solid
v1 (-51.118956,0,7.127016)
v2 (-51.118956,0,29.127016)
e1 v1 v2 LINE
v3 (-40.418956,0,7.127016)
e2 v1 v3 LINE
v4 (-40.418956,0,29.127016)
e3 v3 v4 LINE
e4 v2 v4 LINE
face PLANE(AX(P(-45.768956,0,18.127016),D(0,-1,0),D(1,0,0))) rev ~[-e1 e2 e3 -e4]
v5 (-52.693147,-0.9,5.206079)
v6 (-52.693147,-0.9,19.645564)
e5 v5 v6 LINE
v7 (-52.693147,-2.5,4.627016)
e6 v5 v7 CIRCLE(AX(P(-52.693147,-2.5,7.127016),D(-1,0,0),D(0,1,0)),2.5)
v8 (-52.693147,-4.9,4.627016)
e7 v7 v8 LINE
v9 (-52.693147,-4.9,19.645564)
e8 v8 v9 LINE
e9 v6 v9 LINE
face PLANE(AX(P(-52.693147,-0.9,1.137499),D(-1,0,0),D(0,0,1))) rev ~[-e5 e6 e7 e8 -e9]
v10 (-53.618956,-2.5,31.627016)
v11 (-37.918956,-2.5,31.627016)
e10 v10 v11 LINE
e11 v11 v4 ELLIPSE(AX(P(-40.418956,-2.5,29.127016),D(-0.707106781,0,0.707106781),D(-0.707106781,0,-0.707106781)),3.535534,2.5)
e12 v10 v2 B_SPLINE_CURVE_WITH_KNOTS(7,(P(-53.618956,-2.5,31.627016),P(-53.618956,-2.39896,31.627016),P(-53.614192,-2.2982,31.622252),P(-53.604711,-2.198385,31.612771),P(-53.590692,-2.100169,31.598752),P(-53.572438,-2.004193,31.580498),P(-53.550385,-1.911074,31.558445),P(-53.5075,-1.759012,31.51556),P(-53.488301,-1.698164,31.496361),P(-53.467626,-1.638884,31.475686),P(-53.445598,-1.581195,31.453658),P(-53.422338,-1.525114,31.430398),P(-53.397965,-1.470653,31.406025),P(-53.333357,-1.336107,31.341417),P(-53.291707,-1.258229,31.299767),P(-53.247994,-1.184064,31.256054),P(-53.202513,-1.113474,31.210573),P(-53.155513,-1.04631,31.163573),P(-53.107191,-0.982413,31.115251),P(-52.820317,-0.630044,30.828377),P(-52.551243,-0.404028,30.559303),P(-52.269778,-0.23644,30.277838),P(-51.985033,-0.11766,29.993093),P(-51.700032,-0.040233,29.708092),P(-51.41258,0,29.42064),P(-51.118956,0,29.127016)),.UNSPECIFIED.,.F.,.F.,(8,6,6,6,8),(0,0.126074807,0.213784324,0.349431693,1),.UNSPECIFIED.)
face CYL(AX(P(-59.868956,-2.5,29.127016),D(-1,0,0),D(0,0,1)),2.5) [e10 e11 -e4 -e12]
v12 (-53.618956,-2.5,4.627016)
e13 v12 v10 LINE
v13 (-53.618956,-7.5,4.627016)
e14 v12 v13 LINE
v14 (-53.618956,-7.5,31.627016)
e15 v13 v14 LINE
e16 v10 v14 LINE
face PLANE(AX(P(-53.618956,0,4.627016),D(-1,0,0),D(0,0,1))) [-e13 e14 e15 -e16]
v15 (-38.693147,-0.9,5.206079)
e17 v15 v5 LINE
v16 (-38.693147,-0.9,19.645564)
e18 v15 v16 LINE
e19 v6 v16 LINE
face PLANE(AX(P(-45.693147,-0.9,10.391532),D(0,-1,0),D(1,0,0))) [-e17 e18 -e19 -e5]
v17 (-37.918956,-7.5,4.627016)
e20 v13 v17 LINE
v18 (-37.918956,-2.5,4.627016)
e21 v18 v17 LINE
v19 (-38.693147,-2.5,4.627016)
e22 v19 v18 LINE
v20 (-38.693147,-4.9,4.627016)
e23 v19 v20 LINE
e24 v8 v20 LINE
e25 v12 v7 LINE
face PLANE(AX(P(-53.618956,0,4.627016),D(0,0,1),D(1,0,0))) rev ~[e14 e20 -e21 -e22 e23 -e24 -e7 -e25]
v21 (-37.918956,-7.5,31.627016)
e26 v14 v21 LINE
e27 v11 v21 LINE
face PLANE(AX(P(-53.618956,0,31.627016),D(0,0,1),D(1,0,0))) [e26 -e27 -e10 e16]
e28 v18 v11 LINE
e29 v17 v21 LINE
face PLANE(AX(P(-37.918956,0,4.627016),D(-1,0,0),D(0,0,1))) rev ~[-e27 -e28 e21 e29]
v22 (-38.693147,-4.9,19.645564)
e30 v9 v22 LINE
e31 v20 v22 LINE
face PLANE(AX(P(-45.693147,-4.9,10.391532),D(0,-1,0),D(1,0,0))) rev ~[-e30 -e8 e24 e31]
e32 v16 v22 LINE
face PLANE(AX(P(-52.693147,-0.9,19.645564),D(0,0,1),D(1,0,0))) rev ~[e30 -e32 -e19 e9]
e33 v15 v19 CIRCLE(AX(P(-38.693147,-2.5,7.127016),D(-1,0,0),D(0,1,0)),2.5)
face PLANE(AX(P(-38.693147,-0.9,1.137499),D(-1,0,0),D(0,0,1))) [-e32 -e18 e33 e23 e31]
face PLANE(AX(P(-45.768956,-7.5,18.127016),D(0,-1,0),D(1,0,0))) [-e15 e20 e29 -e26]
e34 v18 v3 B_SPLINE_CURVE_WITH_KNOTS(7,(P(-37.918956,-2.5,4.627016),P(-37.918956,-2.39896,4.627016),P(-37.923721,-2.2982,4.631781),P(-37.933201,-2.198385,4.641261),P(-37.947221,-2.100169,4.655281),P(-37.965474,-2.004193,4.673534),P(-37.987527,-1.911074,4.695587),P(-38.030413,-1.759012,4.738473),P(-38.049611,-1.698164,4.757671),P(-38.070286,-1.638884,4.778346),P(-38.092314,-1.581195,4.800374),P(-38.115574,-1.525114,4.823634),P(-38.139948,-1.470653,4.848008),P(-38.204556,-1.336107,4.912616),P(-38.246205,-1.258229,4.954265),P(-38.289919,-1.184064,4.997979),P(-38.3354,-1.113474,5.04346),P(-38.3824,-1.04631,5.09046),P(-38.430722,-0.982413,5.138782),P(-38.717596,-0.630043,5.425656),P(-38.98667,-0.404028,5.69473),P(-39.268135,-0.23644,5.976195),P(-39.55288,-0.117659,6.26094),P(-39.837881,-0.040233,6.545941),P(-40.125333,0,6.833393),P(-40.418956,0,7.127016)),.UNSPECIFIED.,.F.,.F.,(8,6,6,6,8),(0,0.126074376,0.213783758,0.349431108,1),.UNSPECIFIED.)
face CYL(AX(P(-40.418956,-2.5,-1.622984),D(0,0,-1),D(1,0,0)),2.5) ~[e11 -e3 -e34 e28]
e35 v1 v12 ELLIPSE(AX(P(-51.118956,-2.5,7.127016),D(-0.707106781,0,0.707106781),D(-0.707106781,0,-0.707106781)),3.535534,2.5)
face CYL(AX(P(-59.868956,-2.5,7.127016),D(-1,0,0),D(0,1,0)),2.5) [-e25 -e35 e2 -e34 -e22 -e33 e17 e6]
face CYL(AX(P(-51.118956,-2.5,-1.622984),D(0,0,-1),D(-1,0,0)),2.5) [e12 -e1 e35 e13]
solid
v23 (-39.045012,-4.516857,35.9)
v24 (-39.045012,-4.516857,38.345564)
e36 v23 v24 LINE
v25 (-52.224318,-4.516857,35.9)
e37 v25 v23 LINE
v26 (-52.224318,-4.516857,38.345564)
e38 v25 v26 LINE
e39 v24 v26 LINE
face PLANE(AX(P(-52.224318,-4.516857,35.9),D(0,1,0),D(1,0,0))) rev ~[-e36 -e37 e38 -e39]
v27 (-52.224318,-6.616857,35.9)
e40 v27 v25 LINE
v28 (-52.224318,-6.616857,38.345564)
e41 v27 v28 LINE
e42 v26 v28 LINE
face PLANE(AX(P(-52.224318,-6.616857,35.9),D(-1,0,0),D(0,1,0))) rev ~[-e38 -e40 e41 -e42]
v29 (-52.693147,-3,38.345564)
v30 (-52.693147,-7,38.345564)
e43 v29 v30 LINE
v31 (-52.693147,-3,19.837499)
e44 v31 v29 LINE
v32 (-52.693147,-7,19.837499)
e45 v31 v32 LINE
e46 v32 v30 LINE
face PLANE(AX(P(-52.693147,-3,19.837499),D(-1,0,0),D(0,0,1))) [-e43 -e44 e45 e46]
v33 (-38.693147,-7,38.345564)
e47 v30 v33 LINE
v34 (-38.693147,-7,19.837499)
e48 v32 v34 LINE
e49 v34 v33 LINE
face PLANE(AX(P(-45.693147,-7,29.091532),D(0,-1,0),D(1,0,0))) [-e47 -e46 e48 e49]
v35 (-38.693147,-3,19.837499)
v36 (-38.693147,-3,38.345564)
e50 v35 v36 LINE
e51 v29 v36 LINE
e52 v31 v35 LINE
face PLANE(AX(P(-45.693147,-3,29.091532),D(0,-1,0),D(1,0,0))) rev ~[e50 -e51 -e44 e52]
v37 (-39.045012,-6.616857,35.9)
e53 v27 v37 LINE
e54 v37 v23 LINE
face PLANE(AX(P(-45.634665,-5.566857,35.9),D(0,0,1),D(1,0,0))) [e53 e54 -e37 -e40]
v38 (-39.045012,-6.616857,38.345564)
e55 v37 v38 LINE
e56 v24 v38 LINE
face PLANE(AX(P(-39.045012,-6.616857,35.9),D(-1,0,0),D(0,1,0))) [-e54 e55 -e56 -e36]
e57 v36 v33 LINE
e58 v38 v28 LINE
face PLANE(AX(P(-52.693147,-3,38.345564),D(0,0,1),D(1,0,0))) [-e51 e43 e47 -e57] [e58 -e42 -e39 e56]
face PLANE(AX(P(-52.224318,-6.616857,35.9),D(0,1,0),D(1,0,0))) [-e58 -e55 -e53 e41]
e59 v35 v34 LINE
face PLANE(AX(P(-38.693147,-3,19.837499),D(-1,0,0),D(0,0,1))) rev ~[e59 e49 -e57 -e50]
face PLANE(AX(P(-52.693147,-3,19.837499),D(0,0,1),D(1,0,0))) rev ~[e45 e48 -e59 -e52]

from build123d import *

# Parameters (mm, degrees)
F0_W        = 15.7
F0_H        = 27
F1_DEPTH    = 7.5
F2_W        = 14
F2_H        = 18.5080650263
F3_DEPTH    = 4
F7_T1_DEPTH = 28.2
F7_T3_DEPTH = 39.5
F8_W        = 13.1793060163
F8_H        = 2.1
F9_DEPTH    = 7.5


# Not quite as in the source:
# - a fillet or chamfer that OpenCascade refuses, or shapes differently, is made with other operations: its cross-section is extruded or revolved along the edge and cut away or added


with BuildPart() as f1:
    # F0 (on Front) → F1 (new body)
    with BuildSketch(Plane.XZ):
        with Locations((-45.7689563572, 18.127016373)):
            Rectangle(F0_W, F0_H)
    extrude(amount=F1_DEPTH)


with BuildPart() as f3:
    # F2 (on Front) → F3 (new body)
    with BuildSketch(Plane.XZ):
        with Locations((-45.8931468725, -4.8084680457)):
            Rectangle(F2_W, F2_H)
    extrude(amount=F3_DEPTH)


with BuildPart() as f3_1:
    # F4: moved
    add(f3.part.moved(Location((0.2, -0.9, 15.2))))


with BuildPart() as f1_1:
    add(f1.part)

    # F5: cut F3
    add(f3_1.part, mode=Mode.SUBTRACT)

    # F7: fillet of radius 2.5 on 4 edges, made by hand

    # F7_s2 → F7_t1 (cut)
    with BuildSketch(Plane.YZ.offset(-59.8689563572)):
        with BuildLine():
            ThreePointArc((-2.5, 31.627016373), (-0.732233047, 30.8947833259), (0, 29.127016373))
            Line((0, 29.127016373), (0, 31.627016373))
            Line((0, 31.627016373), (-2.5, 31.627016373))
        make_face()
        with BuildLine():
            ThreePointArc((0, 7.127016373), (-0.732233047, 5.35924942), (-2.5, 4.627016373))
            Line((-2.5, 4.627016373), (0, 4.627016373))
            Line((0, 4.627016373), (0, 7.127016373))
        make_face()
    extrude(amount=F7_T1_DEPTH, mode=Mode.SUBTRACT)

    # F7_s4 → F7_t3 (cut)
    with BuildSketch(Plane.XY.offset(-1.622983627)):
        with BuildLine():
            ThreePointArc((-53.6189563572, -2.5), (-52.8867233102, -0.732233047), (-51.1189563572, 0))
            Line((-51.1189563572, 0), (-53.6189563572, 0))
            Line((-53.6189563572, 0), (-53.6189563572, -2.5))
        make_face()
        with BuildLine():
            ThreePointArc((-37.9189563572, -2.5), (-38.6511894043, -0.732233047), (-40.4189563572, 0))
            Line((-40.4189563572, 0), (-37.9189563572, 0))
            Line((-37.9189563572, 0), (-37.9189563572, -2.5))
        make_face()
    extrude(amount=F7_T3_DEPTH, mode=Mode.SUBTRACT)


with BuildPart() as f3_2:
    # F6: moved
    add(f3_1.part.moved(Location((0, -2.1, 18.7))))


with BuildPart() as f9:
    # F8 (on Top) → F9 (new body)
    with BuildSketch(Plane.XY):
        with Locations((-45.6346645951, -5.5668568239)):
            Rectangle(F8_W, F8_H)
    extrude(amount=F9_DEPTH)


with BuildPart() as f9_1:
    # F10: moved
    add(f9.part.moved(Location((0, 0, 35.9))))


with BuildPart() as f3_3:
    add(f3_2.part)

    # F11: cut F9
    add(f9_1.part, mode=Mode.SUBTRACT)


solid = Compound([f1_1.part, f3_3.part])
